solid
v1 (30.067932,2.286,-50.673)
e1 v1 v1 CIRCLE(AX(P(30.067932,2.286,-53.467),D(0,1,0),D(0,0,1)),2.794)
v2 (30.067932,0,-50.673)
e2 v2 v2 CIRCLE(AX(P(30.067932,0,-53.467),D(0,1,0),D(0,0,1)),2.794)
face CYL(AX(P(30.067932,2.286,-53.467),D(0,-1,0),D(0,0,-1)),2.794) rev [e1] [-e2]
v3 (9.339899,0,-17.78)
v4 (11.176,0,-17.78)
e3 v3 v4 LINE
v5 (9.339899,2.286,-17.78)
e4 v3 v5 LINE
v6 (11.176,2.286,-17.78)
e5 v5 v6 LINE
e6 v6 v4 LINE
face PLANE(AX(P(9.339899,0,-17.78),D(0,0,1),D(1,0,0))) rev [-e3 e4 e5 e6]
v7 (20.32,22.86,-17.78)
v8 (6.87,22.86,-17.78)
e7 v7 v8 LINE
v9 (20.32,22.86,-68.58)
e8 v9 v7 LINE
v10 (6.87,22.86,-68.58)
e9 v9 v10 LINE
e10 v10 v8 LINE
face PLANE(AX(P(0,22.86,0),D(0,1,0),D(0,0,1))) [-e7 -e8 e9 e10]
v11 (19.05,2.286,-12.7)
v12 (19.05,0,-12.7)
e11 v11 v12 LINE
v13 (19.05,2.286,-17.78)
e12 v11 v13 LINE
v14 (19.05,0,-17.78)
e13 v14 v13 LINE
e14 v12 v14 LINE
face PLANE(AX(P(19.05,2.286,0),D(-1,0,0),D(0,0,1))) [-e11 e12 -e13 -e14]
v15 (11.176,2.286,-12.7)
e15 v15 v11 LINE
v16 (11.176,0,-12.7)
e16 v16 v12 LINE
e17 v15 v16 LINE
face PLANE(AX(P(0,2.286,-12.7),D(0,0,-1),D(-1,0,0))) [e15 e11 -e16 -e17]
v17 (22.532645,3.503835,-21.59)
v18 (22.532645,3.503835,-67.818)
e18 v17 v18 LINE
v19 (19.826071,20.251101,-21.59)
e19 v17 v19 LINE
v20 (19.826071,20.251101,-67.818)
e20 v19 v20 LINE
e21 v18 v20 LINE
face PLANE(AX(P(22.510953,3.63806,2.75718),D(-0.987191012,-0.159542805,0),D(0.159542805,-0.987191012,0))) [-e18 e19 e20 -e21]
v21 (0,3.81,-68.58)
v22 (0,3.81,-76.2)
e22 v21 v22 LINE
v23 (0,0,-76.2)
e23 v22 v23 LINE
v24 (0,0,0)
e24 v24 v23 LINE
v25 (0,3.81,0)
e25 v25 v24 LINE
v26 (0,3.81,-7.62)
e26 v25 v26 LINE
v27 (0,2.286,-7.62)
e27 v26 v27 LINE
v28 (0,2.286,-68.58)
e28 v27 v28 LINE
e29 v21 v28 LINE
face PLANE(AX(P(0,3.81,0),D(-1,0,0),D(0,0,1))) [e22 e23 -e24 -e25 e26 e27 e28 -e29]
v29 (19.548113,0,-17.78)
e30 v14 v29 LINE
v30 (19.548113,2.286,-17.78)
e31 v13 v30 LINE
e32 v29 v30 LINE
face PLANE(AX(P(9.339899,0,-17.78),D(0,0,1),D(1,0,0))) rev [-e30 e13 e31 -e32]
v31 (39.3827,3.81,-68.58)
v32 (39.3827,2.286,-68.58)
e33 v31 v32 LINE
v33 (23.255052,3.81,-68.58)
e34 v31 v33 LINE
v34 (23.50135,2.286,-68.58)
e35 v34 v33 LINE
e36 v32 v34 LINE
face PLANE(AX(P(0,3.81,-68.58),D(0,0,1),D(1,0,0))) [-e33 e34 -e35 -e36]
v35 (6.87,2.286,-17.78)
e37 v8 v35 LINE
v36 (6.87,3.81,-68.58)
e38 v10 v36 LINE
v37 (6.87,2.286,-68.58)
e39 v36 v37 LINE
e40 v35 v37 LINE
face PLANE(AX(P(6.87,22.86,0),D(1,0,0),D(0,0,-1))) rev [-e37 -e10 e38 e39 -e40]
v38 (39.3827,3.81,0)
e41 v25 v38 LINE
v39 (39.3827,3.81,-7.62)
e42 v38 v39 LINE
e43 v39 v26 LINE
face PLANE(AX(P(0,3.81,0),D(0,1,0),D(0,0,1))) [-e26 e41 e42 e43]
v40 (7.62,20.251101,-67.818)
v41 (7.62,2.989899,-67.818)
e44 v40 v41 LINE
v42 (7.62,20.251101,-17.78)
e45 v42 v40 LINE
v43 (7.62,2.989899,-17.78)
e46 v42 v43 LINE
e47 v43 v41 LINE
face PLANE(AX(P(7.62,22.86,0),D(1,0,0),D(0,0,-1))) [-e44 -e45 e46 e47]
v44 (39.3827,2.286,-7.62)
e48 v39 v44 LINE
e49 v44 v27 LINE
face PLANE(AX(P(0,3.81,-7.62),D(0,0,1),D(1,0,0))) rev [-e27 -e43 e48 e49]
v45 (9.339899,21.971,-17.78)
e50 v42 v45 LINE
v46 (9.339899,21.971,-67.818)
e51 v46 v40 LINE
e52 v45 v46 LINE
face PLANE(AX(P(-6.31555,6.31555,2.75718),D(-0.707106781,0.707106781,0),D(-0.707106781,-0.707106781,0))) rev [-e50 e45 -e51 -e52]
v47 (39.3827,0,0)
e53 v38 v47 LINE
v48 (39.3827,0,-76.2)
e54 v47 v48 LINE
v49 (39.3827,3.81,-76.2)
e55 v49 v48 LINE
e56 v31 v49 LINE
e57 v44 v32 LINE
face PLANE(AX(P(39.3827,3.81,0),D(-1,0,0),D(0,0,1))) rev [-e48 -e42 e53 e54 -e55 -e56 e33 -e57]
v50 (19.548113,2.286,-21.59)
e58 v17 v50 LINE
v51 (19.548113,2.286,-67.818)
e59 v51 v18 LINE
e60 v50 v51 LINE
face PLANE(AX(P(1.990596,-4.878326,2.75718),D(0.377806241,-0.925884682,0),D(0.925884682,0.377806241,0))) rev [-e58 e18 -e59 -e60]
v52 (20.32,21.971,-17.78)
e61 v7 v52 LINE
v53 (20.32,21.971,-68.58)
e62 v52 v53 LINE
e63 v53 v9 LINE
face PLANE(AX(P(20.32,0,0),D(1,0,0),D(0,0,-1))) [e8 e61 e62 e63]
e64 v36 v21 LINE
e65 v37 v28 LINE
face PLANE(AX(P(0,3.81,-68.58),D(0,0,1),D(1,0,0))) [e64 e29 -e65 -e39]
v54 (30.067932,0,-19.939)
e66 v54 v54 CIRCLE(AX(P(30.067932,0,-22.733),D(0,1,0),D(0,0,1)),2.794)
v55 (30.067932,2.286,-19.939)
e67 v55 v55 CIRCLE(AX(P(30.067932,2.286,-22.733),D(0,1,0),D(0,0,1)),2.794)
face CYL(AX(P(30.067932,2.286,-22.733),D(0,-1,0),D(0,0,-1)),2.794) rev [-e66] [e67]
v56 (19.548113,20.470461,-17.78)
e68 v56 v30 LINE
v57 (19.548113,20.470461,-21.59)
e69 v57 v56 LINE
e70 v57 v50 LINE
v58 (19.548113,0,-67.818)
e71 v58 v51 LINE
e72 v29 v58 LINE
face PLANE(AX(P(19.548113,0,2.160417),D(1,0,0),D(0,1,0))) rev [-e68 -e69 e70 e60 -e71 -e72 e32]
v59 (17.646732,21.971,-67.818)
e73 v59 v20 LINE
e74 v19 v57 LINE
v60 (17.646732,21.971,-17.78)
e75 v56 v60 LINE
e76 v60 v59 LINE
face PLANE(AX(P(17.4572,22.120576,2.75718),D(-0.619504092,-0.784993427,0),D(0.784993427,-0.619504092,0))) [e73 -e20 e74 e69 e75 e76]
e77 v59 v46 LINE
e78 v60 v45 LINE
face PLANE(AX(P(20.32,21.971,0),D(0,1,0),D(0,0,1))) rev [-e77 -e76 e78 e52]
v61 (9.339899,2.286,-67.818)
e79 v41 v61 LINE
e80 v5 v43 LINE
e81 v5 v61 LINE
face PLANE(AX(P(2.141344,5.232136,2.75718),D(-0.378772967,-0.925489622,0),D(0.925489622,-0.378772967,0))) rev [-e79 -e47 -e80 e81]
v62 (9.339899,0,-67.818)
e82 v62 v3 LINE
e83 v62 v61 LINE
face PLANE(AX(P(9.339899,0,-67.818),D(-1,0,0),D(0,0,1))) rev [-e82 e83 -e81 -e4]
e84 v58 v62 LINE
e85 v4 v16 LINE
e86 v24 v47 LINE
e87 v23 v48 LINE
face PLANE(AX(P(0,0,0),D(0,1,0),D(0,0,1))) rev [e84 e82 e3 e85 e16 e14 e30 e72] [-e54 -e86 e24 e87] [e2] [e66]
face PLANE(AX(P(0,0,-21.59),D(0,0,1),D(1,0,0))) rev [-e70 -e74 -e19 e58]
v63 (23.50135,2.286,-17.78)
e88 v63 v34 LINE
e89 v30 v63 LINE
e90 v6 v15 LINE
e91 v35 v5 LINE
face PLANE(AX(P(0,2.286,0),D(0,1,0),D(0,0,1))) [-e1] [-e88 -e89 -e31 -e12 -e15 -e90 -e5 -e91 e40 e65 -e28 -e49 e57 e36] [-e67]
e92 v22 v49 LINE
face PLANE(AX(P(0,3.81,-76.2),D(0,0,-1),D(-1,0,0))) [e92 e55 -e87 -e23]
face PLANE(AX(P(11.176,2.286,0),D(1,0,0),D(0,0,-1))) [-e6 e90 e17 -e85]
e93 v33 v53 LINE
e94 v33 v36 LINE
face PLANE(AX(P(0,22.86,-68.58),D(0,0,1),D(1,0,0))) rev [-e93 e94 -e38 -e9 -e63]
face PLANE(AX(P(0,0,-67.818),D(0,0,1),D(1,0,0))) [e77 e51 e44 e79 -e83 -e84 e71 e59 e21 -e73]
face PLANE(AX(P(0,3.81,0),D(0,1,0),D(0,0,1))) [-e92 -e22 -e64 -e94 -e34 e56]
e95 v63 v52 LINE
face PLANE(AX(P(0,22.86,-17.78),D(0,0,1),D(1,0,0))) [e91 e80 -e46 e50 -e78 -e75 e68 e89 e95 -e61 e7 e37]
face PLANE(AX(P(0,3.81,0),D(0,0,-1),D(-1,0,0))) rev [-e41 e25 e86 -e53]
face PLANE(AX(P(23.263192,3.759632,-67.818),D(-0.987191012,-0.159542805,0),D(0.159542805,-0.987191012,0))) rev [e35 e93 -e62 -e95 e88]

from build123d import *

# Parameters (mm, degrees)
BOSS_EXTRUDE2_DEPTH   = 3.81
BOSS_EXTRUDE2_2_DEPTH = 3.81
SKETCH2_3_W           = 39.3827
SKETCH2_3_H           = 60.96
SKETCH2_3_R           = 2.794
SKETCH2_3_W_2         = 7.874
SKETCH2_3_H_2         = 50.8
BOSS_EXTRUDE3_DEPTH   = 2.286
SKETCH2_4_W           = 0.75
SKETCH2_4_H           = 50.8
BOSS_EXTRUDE4_DEPTH   = 22.86
SKETCH4_W             = 50.8
SKETCH4_H             = 0.889
BOSS_EXTRUDE5_DEPTH   = 12.7
BOSS_EXTRUDE7_DEPTH   = 0.762
BOSS_EXTRUDE8_DEPTH   = 50.8
BOSS_EXTRUDE11_START  = 46.99
BOSS_EXTRUDE11_DEPTH  = 3.81
SKETCH8_W             = 10.208213857
SKETCH8_H             = 50.038
CUT_EXTRUDE2_DEPTH    = 89.208426668


# Read off the part's stored shape, not the designer's step: Boss-Extrude8
with BuildPart() as part:
    # Sketch2 → Boss-Extrude2 (new body)
    with BuildSketch(Plane(origin=(0, 0, 0), x_dir=(1, 0, 0), z_dir=(0, 1, 0))):
        Polygon((0, 7.62), (0, 0), (39.3827, 0), (39.3827, 7.62), (7.62, 7.62), (6.87, 7.62), align=None)
    extrude(amount=BOSS_EXTRUDE2_DEPTH)



with BuildPart() as body_2:
    # Sketch2 → Boss-Extrude2 2 (new body)
    with BuildSketch(Plane(origin=(0, 0, 0), x_dir=(1, 0, 0), z_dir=(0, 1, 0))):
        Polygon((0, 76.2), (0, 68.58), (6.87, 68.58), (7.62, 68.58), (39.3827, 68.58), (39.3827, 76.2), align=None)
    extrude(amount=BOSS_EXTRUDE2_2_DEPTH)


with BuildPart() as part_1:
    add(part.part)

    add(body_2.part)  # Boss-Extrude3 merges body 2
    # Sketch2<3> → Boss-Extrude3 (add)
    with BuildSketch(Plane(origin=(0, 0, 0), x_dir=(1, 0, 0), z_dir=(0, 1, 0))):
        with Locations((19.69135, 38.1)):
            Rectangle(SKETCH2_3_W, SKETCH2_3_H)
        with Locations(Location((30.067932262, 53.467, 0), (0, 0, 270))):
            Circle(SKETCH2_3_R, mode=Mode.SUBTRACT)
        with Locations((15.113, 38.1)):
            Rectangle(SKETCH2_3_W_2, SKETCH2_3_H_2, mode=Mode.SUBTRACT)
        with Locations(Location((30.067932262, 22.733, 0), (0, 0, 270))):
            Circle(SKETCH2_3_R, mode=Mode.SUBTRACT)
    extrude(amount=BOSS_EXTRUDE3_DEPTH)

    # Sketch2<4> → Boss-Extrude4 (add)
    with BuildSketch(Plane(origin=(0, 0, 0), x_dir=(1, 0, 0), z_dir=(0, 1, 0))):
        with Locations((7.245, 43.18)):
            Rectangle(SKETCH2_4_W, SKETCH2_4_H)
    extrude(amount=BOSS_EXTRUDE4_DEPTH)

    # Sketch4 → Boss-Extrude5 (add)
    with BuildSketch(Plane(origin=(7.62, 0, 0), x_dir=(0, 0, -1), z_dir=(1, 0, 0))):
        with Locations((43.18, 22.4155)):
            Rectangle(SKETCH4_W, SKETCH4_H)
    extrude(amount=BOSS_EXTRUDE5_DEPTH)

    # Sketch6 → Boss-Extrude7 (add)
    with BuildSketch(Plane.XY.offset(-68.58)):
        Polygon((7.62, 2.286), (23.50135, 2.286), (23.255051935, 3.81), (22.483164843, 3.81), (19.548112907, 21.971), (7.62, 21.971), align=None)
    extrude(amount=BOSS_EXTRUDE7_DEPTH)

    # Boss-Extrude8 outline → Boss-Extrude8 (add)
    with BuildSketch(Plane.XY.offset(-68.58)):
        Polygon((20.32, 21.971), (17.64673175, 21.971), (19.826070786, 20.25110095), (22.532645041, 3.503835102), (19.548112907, 2.286), (23.50135, 2.286), align=None)
        Polygon((7.62, 20.25110095), (9.33989905, 21.971), (7.62, 21.971), align=None)
        Polygon((7.62, 2.286), (9.33989905, 2.286), (7.62, 2.98989905), align=None)
    extrude(amount=BOSS_EXTRUDE8_DEPTH)

    # Sketch6<6> → Boss-Extrude11 (add)
    with BuildSketch(Plane.XY.offset(-68.58).offset(BOSS_EXTRUDE11_START)):
        Polygon((19.548112907, 20.470460804), (19.548112907, 2.286), (22.532645041, 3.503835102), (19.826070786, 20.25110095), align=None)
    extrude(amount=BOSS_EXTRUDE11_DEPTH)

    # Sketch8 → Cut-Extrude2 (cut, through all)
    with BuildSketch(Plane(origin=(0, 2.286, 0), x_dir=(1, 0, 0), z_dir=(0, 1, 0))):
        with Locations((14.444005979, 42.799)):
            Rectangle(SKETCH8_W, SKETCH8_H)
    extrude(amount=-CUT_EXTRUDE2_DEPTH, mode=Mode.SUBTRACT)


solid = part_1.part
